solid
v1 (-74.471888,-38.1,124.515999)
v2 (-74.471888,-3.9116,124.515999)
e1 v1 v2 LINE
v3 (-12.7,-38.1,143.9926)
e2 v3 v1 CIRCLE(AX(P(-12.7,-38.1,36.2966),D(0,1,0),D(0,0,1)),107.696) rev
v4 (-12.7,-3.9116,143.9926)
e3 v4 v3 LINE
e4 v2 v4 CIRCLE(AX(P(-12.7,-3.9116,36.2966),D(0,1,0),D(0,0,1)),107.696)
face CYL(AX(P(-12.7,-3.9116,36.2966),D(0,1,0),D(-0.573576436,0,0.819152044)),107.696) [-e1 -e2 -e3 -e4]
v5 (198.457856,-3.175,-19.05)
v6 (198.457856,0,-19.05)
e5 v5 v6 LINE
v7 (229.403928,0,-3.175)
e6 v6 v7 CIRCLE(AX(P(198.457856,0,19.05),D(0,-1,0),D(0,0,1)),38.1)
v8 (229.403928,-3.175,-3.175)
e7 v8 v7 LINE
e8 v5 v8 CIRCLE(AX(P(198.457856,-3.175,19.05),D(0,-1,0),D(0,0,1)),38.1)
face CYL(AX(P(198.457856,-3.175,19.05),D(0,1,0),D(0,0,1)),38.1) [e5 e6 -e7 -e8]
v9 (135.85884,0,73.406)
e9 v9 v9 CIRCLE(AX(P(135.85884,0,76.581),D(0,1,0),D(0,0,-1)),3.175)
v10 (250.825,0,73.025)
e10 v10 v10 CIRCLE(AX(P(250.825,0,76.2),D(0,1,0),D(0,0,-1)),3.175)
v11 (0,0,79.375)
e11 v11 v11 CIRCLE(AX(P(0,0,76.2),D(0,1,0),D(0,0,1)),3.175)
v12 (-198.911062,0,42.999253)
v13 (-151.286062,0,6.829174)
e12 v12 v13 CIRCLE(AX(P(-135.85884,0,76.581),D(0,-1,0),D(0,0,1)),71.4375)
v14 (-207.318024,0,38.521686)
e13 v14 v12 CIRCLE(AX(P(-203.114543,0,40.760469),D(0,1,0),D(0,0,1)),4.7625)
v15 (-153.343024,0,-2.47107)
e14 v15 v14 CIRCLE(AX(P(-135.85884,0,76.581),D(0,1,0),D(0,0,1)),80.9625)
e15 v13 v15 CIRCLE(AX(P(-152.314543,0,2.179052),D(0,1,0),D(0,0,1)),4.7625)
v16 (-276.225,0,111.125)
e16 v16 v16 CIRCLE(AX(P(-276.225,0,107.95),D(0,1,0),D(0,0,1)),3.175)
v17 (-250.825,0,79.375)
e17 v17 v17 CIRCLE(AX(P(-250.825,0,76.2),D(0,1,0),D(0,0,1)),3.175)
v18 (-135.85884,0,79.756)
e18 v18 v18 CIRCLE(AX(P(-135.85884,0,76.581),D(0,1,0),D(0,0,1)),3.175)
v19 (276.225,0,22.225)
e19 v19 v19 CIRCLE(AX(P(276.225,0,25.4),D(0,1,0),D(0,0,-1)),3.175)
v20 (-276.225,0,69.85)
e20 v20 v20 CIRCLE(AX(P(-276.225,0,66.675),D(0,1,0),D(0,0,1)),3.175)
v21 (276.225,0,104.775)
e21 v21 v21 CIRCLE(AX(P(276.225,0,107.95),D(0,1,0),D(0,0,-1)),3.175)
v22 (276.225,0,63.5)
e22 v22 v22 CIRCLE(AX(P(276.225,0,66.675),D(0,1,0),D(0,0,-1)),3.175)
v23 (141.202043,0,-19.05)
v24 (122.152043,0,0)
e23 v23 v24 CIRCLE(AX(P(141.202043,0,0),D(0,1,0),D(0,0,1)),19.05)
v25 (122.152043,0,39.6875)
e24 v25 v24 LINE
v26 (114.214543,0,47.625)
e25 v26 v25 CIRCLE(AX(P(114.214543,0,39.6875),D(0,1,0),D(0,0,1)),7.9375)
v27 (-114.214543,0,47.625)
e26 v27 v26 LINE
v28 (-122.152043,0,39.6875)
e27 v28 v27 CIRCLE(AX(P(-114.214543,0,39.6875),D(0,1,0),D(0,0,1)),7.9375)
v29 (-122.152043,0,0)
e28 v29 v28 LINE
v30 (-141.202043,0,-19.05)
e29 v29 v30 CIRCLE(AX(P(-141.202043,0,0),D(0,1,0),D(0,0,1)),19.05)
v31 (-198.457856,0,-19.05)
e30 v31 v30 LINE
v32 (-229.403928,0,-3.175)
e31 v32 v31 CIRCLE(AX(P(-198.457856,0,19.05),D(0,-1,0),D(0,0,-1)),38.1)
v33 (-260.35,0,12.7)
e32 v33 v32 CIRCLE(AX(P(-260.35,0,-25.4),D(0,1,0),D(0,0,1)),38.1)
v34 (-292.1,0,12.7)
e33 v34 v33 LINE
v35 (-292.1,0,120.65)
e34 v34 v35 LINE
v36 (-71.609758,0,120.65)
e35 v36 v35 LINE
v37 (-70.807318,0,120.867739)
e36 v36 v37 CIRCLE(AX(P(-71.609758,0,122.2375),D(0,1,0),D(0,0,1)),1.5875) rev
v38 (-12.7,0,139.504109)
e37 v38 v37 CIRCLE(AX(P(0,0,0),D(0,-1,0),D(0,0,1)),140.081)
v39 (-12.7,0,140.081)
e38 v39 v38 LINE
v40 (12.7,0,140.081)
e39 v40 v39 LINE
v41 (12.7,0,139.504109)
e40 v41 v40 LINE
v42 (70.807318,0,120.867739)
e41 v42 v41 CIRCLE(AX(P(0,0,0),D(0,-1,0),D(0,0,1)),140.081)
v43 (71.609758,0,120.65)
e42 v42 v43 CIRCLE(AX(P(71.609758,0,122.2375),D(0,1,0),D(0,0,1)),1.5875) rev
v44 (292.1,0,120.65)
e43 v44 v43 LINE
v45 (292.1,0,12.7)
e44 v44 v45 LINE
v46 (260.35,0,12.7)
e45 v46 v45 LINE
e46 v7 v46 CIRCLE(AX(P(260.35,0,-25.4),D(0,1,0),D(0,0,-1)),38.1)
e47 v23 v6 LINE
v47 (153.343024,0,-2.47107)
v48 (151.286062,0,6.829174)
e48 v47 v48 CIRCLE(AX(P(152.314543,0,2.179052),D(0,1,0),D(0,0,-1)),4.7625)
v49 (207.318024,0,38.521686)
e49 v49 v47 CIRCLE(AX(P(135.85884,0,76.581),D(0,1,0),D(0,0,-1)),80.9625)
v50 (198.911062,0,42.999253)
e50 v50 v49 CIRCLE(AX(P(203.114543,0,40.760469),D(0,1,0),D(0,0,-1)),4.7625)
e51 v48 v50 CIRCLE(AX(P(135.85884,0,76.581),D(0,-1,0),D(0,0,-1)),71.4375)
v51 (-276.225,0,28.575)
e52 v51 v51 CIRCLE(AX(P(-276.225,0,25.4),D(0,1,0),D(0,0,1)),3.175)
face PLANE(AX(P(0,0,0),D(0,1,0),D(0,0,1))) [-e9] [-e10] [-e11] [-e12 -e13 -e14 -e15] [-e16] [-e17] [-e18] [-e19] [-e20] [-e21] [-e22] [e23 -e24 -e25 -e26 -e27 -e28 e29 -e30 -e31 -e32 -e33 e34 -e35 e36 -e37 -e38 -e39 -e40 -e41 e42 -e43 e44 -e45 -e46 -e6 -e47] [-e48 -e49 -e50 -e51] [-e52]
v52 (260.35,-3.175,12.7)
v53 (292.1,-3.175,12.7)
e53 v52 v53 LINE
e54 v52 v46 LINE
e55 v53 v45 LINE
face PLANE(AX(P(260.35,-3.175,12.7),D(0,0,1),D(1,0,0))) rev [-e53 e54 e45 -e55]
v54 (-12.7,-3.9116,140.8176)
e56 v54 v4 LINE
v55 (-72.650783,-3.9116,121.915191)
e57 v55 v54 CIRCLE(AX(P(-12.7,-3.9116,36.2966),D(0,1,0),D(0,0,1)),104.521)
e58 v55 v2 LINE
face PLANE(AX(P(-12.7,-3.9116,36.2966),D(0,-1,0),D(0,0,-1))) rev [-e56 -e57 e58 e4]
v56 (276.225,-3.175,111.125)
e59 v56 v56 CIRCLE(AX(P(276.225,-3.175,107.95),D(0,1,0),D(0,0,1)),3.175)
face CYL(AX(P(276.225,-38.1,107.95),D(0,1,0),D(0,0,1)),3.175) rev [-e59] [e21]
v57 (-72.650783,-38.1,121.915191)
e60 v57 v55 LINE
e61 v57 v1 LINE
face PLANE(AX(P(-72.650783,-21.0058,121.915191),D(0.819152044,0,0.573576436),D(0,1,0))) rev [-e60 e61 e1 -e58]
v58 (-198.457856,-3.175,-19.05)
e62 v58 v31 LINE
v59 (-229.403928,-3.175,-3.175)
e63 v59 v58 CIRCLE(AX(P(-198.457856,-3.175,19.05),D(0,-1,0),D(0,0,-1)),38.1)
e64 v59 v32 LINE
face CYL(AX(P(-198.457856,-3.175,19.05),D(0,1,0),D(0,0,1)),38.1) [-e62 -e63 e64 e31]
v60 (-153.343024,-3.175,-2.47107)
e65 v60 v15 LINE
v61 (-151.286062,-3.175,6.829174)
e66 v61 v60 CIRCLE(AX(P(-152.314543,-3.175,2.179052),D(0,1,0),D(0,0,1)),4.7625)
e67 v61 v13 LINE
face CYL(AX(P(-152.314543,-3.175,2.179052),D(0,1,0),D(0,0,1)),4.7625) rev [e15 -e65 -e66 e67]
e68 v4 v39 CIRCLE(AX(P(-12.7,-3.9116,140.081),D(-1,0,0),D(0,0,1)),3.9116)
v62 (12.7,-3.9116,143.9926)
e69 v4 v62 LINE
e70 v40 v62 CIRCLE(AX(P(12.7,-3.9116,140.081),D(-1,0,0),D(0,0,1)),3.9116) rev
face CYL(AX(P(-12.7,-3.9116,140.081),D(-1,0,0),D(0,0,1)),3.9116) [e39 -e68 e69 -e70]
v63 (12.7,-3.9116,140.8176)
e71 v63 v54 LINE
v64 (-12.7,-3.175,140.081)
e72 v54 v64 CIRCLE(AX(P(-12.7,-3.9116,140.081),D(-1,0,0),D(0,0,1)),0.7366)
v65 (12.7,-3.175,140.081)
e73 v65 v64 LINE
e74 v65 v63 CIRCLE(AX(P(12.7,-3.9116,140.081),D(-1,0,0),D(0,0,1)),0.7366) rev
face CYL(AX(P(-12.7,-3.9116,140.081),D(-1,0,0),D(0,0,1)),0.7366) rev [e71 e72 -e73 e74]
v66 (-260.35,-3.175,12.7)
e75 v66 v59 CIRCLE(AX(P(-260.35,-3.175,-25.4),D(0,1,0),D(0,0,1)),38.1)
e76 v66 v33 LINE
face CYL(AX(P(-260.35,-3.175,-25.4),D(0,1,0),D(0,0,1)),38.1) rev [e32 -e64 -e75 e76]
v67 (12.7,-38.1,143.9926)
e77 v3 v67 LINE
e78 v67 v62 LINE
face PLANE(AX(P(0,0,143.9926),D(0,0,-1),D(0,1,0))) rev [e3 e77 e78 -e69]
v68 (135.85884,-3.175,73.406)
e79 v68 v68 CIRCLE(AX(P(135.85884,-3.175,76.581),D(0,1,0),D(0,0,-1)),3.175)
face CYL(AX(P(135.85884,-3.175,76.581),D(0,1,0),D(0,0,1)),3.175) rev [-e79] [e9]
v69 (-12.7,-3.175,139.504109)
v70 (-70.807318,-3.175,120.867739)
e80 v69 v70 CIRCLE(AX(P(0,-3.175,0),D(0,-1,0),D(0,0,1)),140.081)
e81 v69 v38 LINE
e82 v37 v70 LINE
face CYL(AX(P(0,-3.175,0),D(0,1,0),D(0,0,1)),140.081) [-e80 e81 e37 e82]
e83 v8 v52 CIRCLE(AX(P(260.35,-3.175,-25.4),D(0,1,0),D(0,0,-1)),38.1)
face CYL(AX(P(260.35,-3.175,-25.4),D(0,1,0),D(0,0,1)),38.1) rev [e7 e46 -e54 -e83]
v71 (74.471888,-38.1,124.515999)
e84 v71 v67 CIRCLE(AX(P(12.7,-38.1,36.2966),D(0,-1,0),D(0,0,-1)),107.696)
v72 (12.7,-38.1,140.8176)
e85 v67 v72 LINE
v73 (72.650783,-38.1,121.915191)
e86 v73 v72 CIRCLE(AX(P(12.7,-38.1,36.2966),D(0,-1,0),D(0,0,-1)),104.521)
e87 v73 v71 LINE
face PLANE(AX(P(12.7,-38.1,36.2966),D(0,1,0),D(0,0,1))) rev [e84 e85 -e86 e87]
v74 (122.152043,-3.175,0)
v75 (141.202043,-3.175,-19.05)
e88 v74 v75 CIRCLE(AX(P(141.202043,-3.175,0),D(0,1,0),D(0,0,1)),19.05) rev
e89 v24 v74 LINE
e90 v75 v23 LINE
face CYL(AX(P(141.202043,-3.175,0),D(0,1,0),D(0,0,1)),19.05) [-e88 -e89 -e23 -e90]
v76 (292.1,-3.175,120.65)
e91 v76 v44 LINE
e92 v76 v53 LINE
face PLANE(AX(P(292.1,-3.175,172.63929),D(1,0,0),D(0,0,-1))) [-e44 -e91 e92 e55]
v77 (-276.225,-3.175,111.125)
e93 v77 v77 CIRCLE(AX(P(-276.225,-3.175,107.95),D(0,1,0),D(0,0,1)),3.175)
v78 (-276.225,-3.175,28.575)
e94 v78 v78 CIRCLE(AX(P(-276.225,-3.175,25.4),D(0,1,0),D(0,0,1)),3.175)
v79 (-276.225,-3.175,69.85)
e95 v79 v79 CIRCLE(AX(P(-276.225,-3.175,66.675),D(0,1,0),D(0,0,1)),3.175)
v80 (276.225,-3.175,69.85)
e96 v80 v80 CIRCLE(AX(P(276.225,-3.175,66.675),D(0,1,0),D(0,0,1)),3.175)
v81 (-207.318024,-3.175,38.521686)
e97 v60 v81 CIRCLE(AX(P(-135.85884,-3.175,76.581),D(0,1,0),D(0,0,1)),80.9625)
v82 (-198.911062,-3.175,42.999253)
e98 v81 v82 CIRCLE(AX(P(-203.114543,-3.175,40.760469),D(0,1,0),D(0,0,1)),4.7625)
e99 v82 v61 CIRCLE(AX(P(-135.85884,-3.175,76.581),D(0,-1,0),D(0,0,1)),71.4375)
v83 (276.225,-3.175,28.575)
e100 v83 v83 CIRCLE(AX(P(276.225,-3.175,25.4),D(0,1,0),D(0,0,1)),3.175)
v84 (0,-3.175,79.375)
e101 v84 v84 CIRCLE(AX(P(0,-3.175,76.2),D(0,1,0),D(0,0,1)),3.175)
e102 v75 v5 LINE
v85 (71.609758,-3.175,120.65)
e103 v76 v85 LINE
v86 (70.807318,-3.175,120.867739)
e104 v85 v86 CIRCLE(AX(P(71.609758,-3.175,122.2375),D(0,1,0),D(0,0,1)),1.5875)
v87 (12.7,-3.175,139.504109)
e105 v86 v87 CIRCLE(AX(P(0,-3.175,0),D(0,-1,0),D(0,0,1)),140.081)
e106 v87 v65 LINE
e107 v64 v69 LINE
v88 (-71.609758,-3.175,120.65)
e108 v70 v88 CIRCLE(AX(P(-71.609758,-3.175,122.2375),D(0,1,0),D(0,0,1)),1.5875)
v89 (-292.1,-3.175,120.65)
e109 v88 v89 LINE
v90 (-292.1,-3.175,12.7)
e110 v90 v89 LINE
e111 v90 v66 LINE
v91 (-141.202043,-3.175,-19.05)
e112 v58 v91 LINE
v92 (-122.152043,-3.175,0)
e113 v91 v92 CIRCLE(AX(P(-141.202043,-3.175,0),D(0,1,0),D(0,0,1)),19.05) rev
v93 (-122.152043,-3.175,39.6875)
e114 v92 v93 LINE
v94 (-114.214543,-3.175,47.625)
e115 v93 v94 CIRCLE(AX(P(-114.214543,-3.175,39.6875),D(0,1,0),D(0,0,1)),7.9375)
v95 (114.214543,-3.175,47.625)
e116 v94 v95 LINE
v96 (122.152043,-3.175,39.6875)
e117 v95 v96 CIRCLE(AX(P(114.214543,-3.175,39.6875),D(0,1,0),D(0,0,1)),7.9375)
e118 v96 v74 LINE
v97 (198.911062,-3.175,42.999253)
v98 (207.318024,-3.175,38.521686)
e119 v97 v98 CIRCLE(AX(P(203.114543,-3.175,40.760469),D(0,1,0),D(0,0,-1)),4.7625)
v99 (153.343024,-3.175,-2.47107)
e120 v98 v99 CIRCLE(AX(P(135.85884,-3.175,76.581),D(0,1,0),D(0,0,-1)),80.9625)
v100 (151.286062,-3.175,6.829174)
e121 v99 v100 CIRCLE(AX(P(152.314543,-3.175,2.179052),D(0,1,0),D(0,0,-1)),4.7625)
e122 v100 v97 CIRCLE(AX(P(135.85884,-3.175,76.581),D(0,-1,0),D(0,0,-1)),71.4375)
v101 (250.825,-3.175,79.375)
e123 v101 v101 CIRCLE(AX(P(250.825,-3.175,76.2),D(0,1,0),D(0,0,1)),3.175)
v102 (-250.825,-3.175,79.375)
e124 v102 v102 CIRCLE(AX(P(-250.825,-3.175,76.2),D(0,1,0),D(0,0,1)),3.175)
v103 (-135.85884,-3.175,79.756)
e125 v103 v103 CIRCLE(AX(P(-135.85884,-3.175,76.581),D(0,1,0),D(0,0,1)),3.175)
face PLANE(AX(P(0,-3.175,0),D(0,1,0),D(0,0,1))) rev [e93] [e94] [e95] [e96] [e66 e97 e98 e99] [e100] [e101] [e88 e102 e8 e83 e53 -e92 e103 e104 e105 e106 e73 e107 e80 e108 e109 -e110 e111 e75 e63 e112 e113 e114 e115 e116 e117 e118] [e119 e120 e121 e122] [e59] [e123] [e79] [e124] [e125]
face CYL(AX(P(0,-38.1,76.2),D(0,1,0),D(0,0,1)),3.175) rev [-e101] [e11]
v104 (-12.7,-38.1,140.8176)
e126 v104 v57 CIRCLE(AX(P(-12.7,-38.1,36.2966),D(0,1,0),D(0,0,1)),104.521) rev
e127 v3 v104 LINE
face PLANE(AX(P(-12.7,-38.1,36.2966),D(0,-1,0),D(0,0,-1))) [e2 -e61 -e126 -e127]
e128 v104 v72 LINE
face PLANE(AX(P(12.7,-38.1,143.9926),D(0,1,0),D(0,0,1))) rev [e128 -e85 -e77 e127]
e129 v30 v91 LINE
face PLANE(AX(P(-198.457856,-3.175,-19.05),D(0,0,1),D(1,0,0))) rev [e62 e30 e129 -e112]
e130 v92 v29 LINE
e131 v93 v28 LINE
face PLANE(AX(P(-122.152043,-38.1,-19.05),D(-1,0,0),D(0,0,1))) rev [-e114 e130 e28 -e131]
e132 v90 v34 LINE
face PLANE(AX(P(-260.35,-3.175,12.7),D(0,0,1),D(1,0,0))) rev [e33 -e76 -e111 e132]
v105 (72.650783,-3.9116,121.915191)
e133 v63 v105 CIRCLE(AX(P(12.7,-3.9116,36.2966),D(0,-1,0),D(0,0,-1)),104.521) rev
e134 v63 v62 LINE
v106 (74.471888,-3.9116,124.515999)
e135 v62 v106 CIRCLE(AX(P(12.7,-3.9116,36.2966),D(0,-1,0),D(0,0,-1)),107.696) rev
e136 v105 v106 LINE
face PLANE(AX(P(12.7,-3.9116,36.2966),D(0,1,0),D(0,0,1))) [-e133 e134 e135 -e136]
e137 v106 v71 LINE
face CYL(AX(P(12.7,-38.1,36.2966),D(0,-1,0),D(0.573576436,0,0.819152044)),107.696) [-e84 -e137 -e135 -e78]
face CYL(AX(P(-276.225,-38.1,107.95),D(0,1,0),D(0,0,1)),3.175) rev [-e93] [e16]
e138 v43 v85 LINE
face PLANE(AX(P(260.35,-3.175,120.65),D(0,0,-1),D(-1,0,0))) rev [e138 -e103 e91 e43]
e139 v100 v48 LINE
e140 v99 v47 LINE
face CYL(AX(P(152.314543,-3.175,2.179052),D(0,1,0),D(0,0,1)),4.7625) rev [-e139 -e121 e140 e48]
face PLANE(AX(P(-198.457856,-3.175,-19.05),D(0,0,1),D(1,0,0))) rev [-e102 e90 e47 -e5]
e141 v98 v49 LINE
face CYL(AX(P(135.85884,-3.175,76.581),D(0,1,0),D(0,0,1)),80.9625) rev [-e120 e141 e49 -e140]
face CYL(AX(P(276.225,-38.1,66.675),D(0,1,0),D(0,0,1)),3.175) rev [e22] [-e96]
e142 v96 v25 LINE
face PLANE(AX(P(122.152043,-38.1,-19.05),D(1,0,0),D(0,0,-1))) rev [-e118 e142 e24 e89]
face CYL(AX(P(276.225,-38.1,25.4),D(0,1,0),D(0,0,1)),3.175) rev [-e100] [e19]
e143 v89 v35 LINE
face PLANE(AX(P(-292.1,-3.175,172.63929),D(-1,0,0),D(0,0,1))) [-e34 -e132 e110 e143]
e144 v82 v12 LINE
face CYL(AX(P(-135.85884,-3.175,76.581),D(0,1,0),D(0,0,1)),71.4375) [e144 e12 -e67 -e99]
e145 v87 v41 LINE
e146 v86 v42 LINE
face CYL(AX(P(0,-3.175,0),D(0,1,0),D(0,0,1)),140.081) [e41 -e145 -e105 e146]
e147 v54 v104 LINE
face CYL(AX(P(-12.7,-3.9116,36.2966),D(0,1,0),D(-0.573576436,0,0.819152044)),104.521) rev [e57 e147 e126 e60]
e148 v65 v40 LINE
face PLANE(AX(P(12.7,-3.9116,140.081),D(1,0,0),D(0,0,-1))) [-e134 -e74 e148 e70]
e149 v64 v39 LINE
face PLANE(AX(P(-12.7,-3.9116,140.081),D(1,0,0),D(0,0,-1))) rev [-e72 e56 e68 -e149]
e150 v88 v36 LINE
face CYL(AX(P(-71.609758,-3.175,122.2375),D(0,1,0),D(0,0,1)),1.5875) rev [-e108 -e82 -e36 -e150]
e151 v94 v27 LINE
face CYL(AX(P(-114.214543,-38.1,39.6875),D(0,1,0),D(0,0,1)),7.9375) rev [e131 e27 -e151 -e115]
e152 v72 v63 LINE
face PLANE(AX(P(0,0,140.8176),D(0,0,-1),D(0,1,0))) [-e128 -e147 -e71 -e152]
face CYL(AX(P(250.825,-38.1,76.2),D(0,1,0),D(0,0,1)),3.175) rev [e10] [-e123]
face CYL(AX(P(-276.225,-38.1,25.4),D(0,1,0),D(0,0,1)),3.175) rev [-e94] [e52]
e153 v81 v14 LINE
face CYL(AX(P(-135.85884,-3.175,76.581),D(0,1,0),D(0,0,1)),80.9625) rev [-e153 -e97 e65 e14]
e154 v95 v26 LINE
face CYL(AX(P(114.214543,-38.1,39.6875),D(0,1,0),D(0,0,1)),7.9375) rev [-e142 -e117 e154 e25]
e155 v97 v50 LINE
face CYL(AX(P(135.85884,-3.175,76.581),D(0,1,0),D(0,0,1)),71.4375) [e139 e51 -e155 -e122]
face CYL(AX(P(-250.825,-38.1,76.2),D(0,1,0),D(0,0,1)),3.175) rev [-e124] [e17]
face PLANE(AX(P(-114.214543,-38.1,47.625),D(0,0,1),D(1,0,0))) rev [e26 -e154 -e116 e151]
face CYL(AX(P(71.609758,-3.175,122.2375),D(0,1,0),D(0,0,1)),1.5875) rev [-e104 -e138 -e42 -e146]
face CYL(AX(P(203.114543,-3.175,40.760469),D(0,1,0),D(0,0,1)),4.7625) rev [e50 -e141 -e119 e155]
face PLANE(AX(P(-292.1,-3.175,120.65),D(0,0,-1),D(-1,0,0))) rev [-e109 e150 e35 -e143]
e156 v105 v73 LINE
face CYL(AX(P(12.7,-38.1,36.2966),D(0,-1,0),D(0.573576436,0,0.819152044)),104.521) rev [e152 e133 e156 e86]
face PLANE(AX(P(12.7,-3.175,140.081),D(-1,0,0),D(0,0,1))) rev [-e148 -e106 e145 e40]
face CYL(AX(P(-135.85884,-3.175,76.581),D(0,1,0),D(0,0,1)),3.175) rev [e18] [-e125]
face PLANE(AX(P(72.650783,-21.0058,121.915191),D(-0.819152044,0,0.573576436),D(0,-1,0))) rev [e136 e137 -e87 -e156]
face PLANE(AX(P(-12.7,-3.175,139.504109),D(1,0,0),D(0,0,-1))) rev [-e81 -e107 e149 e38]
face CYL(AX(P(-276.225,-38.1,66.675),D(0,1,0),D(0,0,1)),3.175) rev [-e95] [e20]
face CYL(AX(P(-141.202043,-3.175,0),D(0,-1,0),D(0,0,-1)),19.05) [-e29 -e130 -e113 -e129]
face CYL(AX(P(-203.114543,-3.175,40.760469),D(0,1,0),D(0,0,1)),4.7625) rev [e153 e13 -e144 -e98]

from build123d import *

# Parameters (mm, degrees)
SKETCH1_W          = 584.2
SKETCH1_H          = 304.8
BASE_FLANGE1_DEPTH = 3.175
SKETCH6_R          = 3.175
CUT_EXTRUDE1_DEPTH = 340.318162239
CUT_EXTRUDE2_DEPTH = 340.318162239
EDGE_FLANGE1_DEPTH = 25.4
HEM1_START         = -38.1
HEM1_DEPTH         = 34.1884
FILLET1_R          = 1.5875
SKETCH16_R         = 3.175
CUT_EXTRUDE3_DEPTH = 328.883956385
CUT_EXTRUDE4_DEPTH = 328.883956385
FILLET3_R          = 19.05


# Read off the part's stored shape, not the designer's step: Hem1
# Sheet-metal steps are written as plain solids
with BuildPart() as part:
    # Sketch1 → Base-Flange1 (new body)
    with BuildSketch(Plane(origin=(0, 0, 0), x_dir=(1, 0, 0), z_dir=(0, 1, 0))):
        with Locations((0, -20.239290429)):
            Rectangle(SKETCH1_W, SKETCH1_H)
    extrude(amount=-BASE_FLANGE1_DEPTH)

    # Sketch6 → Cut-Extrude1 (cut, through all)
    with BuildSketch(Plane(origin=(0, 0, 0), x_dir=(1, 0, 0), z_dir=(0, 1, 0))):
        with Locations(Location((-135.858839885, -76.581, 0), (0, 0, 270))):
            Circle(SKETCH6_R)
        with Locations(Location((135.858839885, -76.581, 0), (0, 0, 90))):
            Circle(SKETCH6_R)
        with BuildLine():
            ThreePointArc((-153.343024391, 2.471069539), (-184.826505048, -12.105468402), (-207.318024391, -38.521686343))
            ThreePointArc((-207.318024391, -38.521686343), (-205.353326106, -44.963950941), (-198.911061508, -42.999252655))
            ThreePointArc((-198.911061508, -42.999252655), (-179.065603264, -19.690825061), (-151.286061508, -6.829173936))
            ThreePointArc((-151.286061508, -6.829173936), (-147.664421212, -1.150570757), (-153.343024391, 2.471069539))
        make_face()
        with BuildLine():
            ThreePointArc((153.343024391, 2.471069539), (184.826505048, -12.105468402), (207.318024391, -38.521686343))
            ThreePointArc((207.318024391, -38.521686343), (205.353326106, -44.963950941), (198.911061508, -42.999252655))
            ThreePointArc((198.911061508, -42.999252655), (179.065603264, -19.690825061), (151.286061508, -6.829173936))
            ThreePointArc((151.286061508, -6.829173936), (147.664421212, -1.150570757), (153.343024391, 2.471069539))
        make_face()
    extrude(amount=-CUT_EXTRUDE1_DEPTH, mode=Mode.SUBTRACT)

    # Sketch7 → Cut-Extrude2 (cut, through all)
    with BuildSketch(Plane(origin=(0, 0, 0), x_dir=(1, 0, 0), z_dir=(0, 1, 0))):
        with BuildLine():
            Line((292.1, -120.65), (260.35, -120.65))
            Line((260.35, -120.65), (71.177693563, -120.65))
            ThreePointArc((71.177693563, -120.65), (42.985302493, -133.322729985), (12.7, -139.504109477))
            Line((12.7, -139.504109477), (12.7, -140.081))
            Line((12.7, -140.081), (-12.7, -140.081))
            Line((-12.7, -140.081), (-12.7, -139.504109477))
            ThreePointArc((-12.7, -139.504109477), (-42.985302493, -133.322729985), (-71.177693563, -120.65))
            Line((-71.177693563, -120.65), (-260.35, -120.65))
            Line((-260.35, -120.65), (-292.1, -120.65))
            Line((-292.1, -120.65), (-292.1, -172.639290429))
            Line((-292.1, -172.639290429), (292.1, -172.639290429))
            Line((292.1, -172.639290429), (292.1, -120.65))
        make_face()
        with BuildLine():
            Line((260.35, -12.7), (292.1, -12.7))
            Line((292.1, -12.7), (292.1, 132.160709571))
            Line((292.1, 132.160709571), (-292.1, 132.160709571))
            Line((-292.1, 132.160709571), (-292.1, -12.7))
            Line((-292.1, -12.7), (-260.35, -12.7))
            ThreePointArc((-260.35, -12.7), (-242.959808799, -8.49972345), (-229.403927955, 3.175))
            ThreePointArc((-229.403927955, 3.175), (-215.848047111, 14.84972345), (-198.45785591, 19.05))
            Line((-198.45785591, 19.05), (198.45785591, 19.05))
            ThreePointArc((198.45785591, 19.05), (215.848047111, 14.84972345), (229.403927955, 3.175))
            ThreePointArc((229.403927955, 3.175), (242.959808799, -8.49972345), (260.35, -12.7))
        make_face()
    extrude(amount=-CUT_EXTRUDE2_DEPTH, mode=Mode.SUBTRACT)

    # Edge-Flange1 section (across the edge) → Edge-Flange1 (add)
    with BuildSketch(Plane(origin=(12.7, -3.175, 140.8176), x_dir=(0, 0, -1), z_dir=(-1, 0, 0))):
        with BuildLine():
            Line((-3.175, 0.7366), (-3.175, 34.925))
            Line((-3.175, 34.925), (0, 34.925))
            Line((0, 34.925), (0, 0.7366))
            ThreePointArc((0, 0.7366), (0.215745145, 0.215745145), (0.7366, 0))
            Line((0.7366, 0), (0.7366, -3.175))
            ThreePointArc((0.7366, -3.175), (-2.029318885, -2.029318885), (-3.175, 0.7366))
        make_face()
    extrude(amount=EDGE_FLANGE1_DEPTH)

    # Hem1 outline → Hem1 (add)
    with BuildSketch(Plane(origin=(0, 0, 0), x_dir=(1, 0, 0), z_dir=(0, 1, 0)).offset(HEM1_START)):
        with BuildLine():
            Line((-72.650782704, -121.915190821), (-74.471887889, -124.515998562))
            ThreePointArc((-74.471887889, -124.515998562), (-45.084811783, -139.008100728), (-12.7, -143.9926))
            Line((-12.7, -143.9926), (-12.7, -140.8176))
            ThreePointArc((-12.7, -140.8176), (-44.13007087, -135.980049409), (-72.650782704, -121.915190821))
        make_face()
        with BuildLine():
            Line((74.471887889, -124.515998562), (72.650782704, -121.915190821))
            ThreePointArc((72.650782704, -121.915190821), (44.13007087, -135.980049409), (12.7, -140.8176))
            Line((12.7, -140.8176), (12.7, -143.9926))
            ThreePointArc((12.7, -143.9926), (45.084811783, -139.008100728), (74.471887889, -124.515998562))
        make_face()
    extrude(amount=HEM1_DEPTH)

    # Fillet1
    fillet1_edges = [part.edges().sort_by_distance(p)[0] for p in [
        (-71.177693563, -1.5875, 120.65),
        (71.177693563, -1.5875, 120.65),
    ]]
    fillet(fillet1_edges, radius=FILLET1_R)

    # Sketch16 → Cut-Extrude3 (cut, through all)
    with BuildSketch(Plane(origin=(0, 0, 0), x_dir=(1, 0, 0), z_dir=(0, 1, 0))):
        with Locations(Location((0, -76.2, 0), (0, 0, 270))):
            Circle(SKETCH16_R)
        with Locations(Location((-276.225, -25.4, 0), (0, 0, 270))):
            Circle(SKETCH16_R)
        with Locations(Location((-276.225, -107.95, 0), (0, 0, 270))):
            Circle(SKETCH16_R)
        with Locations(Location((-250.825, -76.2, 0), (0, 0, 270))):
            Circle(SKETCH16_R)
        with Locations(Location((276.225, -66.675, 0), (0, 0, 270))):
            Circle(SKETCH16_R)
        with Locations(Location((-276.225, -66.675, 0), (0, 0, 270))):
            Circle(SKETCH16_R)
        with Locations(Location((276.225, -107.95, 0), (0, 0, 270))):
            Circle(SKETCH16_R)
        with Locations(Location((276.225, -25.4, 0), (0, 0, 270))):
            Circle(SKETCH16_R)
        with Locations(Location((250.825, -76.2, 0), (0, 0, 270))):
            Circle(SKETCH16_R)
    extrude(amount=-CUT_EXTRUDE3_DEPTH, mode=Mode.SUBTRACT)

    # Sketch17 → Cut-Extrude4 (cut, through all)
    with BuildSketch(Plane(origin=(0, 0, 0), x_dir=(1, 0, 0), z_dir=(0, 1, 0))):
        with BuildLine():
            Line((-122.152042949, 19.05), (122.152042949, 19.05))
            Line((122.152042949, 19.05), (122.152042949, -39.6875))
            ThreePointArc((122.152042949, -39.6875), (119.827203025, -45.300160076), (114.214542949, -47.625))
            Line((114.214542949, -47.625), (-114.214542949, -47.625))
            ThreePointArc((-114.214542949, -47.625), (-119.827203025, -45.300160076), (-122.152042949, -39.6875))
            Line((-122.152042949, -39.6875), (-122.152042949, 19.05))
        make_face()
    extrude(amount=-CUT_EXTRUDE4_DEPTH, mode=Mode.SUBTRACT)

    # Fillet3
    fillet3_edges = [part.edges().sort_by_distance(p)[0] for p in [
        (122.152042949, -1.5875, -19.05),
        (-122.152042949, -1.5875, -19.05),
    ]]
    fillet(fillet3_edges, radius=FILLET3_R)


solid = part.part
